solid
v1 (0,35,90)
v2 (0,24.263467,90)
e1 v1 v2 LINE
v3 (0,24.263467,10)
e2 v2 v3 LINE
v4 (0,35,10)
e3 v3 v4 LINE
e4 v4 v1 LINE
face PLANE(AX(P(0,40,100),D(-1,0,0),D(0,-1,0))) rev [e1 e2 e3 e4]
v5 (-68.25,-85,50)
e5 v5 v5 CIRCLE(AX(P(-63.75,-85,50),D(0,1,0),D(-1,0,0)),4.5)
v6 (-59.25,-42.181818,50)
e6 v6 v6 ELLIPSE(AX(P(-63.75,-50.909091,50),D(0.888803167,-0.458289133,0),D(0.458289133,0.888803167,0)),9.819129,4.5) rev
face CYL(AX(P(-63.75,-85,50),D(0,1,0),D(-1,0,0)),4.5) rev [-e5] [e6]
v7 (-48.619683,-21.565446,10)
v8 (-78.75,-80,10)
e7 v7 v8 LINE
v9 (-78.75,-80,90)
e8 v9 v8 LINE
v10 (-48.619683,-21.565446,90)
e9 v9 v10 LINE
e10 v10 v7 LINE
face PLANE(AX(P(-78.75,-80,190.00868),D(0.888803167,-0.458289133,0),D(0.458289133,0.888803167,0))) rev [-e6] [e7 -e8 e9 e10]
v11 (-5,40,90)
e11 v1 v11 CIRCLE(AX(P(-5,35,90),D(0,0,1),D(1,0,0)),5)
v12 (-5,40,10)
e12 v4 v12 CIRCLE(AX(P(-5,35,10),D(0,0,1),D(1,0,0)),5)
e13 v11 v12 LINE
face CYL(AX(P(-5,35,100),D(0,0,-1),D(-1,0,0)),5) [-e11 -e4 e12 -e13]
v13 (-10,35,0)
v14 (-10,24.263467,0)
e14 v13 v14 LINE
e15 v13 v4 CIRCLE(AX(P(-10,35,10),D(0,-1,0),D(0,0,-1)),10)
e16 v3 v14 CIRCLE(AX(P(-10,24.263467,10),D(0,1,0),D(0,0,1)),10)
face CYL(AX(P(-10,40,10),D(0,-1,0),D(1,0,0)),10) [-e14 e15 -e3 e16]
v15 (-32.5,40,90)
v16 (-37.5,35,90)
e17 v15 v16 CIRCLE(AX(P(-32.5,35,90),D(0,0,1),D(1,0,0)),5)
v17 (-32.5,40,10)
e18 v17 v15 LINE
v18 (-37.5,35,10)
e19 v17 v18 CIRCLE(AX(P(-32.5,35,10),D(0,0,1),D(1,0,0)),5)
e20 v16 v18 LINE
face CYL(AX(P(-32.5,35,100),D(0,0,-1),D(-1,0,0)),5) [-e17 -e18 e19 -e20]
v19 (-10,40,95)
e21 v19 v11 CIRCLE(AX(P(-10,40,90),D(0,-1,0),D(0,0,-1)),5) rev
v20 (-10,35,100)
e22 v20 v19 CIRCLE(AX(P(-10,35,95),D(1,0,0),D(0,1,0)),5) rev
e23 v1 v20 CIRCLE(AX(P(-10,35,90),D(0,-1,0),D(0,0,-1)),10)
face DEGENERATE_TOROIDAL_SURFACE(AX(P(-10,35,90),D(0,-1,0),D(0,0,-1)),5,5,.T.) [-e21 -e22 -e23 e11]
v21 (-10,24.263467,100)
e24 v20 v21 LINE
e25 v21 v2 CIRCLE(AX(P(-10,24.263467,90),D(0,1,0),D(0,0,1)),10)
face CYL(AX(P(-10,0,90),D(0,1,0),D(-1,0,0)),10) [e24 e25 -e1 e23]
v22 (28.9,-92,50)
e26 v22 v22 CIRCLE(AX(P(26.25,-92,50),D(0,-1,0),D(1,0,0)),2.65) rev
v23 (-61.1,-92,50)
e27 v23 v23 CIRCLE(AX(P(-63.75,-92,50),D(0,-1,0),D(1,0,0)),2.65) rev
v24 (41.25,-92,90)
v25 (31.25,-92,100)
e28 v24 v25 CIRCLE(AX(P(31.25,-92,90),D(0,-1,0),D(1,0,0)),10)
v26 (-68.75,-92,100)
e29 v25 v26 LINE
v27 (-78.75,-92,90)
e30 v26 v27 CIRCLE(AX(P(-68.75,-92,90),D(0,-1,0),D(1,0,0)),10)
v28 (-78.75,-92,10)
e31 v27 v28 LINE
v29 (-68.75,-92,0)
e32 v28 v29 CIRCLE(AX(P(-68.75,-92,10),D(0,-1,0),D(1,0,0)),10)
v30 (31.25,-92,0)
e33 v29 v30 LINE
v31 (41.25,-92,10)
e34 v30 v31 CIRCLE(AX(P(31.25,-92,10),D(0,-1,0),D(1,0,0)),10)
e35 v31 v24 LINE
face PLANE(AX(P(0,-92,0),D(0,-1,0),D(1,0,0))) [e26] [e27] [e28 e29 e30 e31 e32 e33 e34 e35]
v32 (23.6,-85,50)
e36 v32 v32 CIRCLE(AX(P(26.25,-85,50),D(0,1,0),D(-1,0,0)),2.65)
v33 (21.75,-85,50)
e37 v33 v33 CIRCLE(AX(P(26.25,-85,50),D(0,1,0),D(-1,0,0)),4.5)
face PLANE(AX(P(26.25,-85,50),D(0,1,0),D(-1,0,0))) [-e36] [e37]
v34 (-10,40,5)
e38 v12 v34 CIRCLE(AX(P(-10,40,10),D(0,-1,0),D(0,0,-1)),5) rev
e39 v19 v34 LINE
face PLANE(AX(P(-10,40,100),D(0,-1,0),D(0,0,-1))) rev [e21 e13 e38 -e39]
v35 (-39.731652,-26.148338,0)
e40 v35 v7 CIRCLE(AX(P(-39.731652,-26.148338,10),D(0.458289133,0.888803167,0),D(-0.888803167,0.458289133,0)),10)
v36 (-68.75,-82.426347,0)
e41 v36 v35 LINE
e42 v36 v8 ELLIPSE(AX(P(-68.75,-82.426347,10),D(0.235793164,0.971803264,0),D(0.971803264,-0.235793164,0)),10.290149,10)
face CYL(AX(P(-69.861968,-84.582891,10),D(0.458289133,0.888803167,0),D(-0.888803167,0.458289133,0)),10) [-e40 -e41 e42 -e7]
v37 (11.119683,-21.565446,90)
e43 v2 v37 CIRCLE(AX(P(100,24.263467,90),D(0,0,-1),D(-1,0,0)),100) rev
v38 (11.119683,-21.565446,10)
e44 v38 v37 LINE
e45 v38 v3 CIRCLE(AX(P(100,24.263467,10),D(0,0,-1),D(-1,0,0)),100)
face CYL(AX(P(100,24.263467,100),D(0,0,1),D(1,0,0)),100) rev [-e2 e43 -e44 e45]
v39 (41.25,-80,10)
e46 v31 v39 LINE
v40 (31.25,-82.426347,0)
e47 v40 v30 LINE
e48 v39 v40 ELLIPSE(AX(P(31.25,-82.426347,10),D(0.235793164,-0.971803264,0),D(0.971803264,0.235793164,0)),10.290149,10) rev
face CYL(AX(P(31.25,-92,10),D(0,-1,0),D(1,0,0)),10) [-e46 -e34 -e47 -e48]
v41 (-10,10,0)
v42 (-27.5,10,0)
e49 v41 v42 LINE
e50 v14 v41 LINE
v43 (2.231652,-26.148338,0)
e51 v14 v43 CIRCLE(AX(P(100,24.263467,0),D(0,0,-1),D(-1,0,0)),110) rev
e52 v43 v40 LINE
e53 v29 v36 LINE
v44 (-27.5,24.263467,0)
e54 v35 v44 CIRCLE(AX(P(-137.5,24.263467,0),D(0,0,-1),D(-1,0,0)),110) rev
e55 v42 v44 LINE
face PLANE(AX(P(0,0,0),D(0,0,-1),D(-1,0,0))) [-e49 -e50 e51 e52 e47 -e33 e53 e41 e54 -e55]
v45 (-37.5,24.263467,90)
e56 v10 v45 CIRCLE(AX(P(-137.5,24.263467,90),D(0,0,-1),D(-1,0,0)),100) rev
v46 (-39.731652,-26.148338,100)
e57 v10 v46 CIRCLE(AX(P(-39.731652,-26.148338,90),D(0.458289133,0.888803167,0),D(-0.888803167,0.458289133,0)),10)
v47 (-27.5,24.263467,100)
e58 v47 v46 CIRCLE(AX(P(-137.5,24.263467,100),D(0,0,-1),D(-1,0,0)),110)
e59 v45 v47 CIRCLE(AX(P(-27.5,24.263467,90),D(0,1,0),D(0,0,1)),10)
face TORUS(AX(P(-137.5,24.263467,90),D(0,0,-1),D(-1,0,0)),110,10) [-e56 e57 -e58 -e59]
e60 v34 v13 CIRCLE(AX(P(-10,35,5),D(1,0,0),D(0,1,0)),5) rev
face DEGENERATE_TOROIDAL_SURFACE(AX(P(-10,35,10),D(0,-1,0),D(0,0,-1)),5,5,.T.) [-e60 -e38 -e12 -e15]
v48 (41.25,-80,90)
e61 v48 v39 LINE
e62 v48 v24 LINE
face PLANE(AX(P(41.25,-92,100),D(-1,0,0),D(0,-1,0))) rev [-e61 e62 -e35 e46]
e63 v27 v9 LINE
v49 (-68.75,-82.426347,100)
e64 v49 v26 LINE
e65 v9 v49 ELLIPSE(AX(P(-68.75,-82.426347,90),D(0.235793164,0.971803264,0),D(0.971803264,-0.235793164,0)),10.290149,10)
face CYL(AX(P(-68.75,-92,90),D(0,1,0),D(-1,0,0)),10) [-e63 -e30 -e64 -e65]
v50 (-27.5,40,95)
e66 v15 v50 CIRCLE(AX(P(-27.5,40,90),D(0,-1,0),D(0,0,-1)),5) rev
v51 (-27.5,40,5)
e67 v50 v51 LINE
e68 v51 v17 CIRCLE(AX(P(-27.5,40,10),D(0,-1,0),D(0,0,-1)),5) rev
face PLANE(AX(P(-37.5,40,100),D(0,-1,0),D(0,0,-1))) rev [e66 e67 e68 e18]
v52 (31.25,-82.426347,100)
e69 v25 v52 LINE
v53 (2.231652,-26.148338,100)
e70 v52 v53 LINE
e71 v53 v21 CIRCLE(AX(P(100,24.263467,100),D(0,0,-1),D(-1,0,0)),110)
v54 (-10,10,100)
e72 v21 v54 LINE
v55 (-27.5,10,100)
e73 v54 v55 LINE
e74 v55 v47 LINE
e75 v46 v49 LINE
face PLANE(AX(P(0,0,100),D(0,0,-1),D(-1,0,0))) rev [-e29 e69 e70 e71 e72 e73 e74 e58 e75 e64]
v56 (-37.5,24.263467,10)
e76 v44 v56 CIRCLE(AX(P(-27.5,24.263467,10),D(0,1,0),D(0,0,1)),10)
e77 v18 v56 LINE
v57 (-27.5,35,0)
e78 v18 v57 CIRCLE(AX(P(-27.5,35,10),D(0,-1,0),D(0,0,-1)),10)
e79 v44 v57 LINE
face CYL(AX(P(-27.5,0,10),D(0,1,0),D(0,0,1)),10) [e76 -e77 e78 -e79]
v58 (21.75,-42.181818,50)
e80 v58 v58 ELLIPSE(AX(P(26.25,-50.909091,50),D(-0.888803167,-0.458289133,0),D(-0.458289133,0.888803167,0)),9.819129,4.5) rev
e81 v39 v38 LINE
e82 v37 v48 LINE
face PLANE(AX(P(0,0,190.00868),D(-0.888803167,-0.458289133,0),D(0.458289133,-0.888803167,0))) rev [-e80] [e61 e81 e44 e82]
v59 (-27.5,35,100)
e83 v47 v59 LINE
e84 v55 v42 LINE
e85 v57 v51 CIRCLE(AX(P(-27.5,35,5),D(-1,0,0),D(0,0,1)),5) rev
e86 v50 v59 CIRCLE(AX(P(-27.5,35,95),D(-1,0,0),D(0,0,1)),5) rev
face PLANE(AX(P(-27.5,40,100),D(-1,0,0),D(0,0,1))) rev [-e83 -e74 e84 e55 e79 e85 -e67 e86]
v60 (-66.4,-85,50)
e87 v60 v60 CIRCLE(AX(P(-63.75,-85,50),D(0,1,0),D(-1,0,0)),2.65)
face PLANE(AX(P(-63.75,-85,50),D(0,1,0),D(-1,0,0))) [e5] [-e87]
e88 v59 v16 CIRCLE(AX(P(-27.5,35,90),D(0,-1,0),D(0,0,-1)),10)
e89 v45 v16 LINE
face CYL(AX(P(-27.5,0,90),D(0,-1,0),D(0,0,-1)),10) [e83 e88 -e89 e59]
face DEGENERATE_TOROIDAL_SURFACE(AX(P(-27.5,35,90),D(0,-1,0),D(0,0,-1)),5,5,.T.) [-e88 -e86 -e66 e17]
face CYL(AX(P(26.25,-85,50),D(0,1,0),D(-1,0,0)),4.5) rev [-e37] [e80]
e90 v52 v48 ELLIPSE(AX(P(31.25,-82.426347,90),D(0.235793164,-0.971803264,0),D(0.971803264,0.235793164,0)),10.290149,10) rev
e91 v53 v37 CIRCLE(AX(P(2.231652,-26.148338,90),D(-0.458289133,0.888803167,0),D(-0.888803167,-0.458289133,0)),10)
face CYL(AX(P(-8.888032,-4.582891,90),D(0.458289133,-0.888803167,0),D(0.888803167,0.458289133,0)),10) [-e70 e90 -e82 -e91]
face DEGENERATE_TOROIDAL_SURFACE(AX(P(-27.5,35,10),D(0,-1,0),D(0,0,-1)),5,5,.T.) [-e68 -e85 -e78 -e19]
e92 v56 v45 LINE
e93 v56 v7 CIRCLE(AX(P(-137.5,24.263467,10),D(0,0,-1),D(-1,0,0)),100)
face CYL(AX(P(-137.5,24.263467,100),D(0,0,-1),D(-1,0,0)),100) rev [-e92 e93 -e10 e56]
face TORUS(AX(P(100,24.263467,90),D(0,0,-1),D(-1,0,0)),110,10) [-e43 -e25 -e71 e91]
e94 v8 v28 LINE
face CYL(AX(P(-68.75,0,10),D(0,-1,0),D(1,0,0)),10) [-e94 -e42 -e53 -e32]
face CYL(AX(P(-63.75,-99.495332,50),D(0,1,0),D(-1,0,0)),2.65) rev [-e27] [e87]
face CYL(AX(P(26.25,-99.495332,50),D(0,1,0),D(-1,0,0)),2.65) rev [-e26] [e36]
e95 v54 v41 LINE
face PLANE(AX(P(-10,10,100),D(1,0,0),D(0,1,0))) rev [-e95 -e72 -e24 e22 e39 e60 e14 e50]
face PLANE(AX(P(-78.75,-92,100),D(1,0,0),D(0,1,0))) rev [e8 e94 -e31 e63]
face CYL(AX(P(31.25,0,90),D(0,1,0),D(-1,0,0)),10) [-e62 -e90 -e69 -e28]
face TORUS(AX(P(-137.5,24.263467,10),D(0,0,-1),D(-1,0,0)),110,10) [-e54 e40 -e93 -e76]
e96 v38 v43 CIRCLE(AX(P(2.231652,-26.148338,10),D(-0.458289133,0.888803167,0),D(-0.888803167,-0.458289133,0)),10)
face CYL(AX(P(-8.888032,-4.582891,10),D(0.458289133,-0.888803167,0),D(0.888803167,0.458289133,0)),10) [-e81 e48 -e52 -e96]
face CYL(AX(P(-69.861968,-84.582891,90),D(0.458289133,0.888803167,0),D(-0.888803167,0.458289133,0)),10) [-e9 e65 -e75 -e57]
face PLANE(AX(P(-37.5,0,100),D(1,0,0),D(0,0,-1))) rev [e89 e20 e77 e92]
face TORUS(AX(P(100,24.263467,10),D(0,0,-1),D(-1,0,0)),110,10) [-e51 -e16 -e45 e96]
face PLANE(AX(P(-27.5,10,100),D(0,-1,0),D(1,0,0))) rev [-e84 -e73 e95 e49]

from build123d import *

# Parameters (mm, degrees)
BOSS_EXTRUDE1_DEPTH = 100
SKETCH2_W           = 120
SKETCH2_H           = 100
BOSS_EXTRUDE2_DEPTH = 92
SKETCH3_R           = 4.5
CUT_EXTRUDE1_DEPTH  = 85
SKETCH4_R           = 2.65
CUT_EXTRUDE2_DEPTH  = 7
CUT_EXTRUDE3_REACH  = 159.053
FILLET1_R           = 100
FILLET2_R           = 100
FILLET4_R           = 10
FILLET5_R           = 5


with BuildPart() as part:
    # Sketch1 → Boss-Extrude1 (new body)
    with BuildSketch(Plane.XY):
        Polygon((0, 0), (-37.5, 0), (-37.5, 40), (-27.5, 40), (-27.5, 10), (-10, 10), (-10, 40), (0, 40), align=None)
    extrude(amount=BOSS_EXTRUDE1_DEPTH)

    # Sketch2 → Boss-Extrude2 (add)
    with BuildSketch(Plane.XZ):
        with Locations((-18.75, 50)):
            Rectangle(SKETCH2_W, SKETCH2_H)
    extrude(amount=BOSS_EXTRUDE2_DEPTH)

    # Sketch3 → Cut-Extrude1 (cut)
    with BuildSketch(Plane(origin=(0, 0, 0), x_dir=(1, 0, 0), z_dir=(0, 1, 0))):
        with Locations(Location((26.25, -50, 0), (0, 0, 180))):
            Circle(SKETCH3_R)
        with Locations(Location((-63.75, -50, 0), (0, 0, 180))):
            Circle(SKETCH3_R)
    extrude(amount=-CUT_EXTRUDE1_DEPTH, mode=Mode.SUBTRACT)

    # Sketch4 → Cut-Extrude2 (cut)
    with BuildSketch(Plane(origin=(0, -85, 0), x_dir=(1, 0, 0), z_dir=(0, 1, 0))):
        with Locations(Location((26.25, -50, 0), (0, 0, 180))):
            Circle(SKETCH4_R)
        with Locations(Location((-63.75, -50, 0), (0, 0, 180))):
            Circle(SKETCH4_R)
    extrude(amount=-CUT_EXTRUDE2_DEPTH, mode=Mode.SUBTRACT)

    # Cut-Extrude3: up to this face of the body (flat: up to its plane)
    cut_extrude3_end = Plane(part.part.faces().sort_by_distance((-18.75, -40.86267166, 100))[0])
    # Sketch5 → Cut-Extrude3 (cut, up to the picked face)
    with BuildSketch(Plane(origin=(0, 0, 0), x_dir=(-1, 0, 0), z_dir=(0, 0, -1)), mode=Mode.PRIVATE) as cut_extrude3_sk1:
        Polygon((0, 0), (-41.25, -80), (-41.25, 0), align=None)
    cut_extrude3_tool1 = split(extrude(cut_extrude3_sk1.sketch, amount=-CUT_EXTRUDE3_REACH, mode=Mode.PRIVATE), bisect_by=cut_extrude3_end, keep=Keep.BOTH, mode=Mode.PRIVATE)
    # Sketch5 → Cut-Extrude3 (cut, up to the picked face)
    with BuildSketch(Plane(origin=(0, 0, 0), x_dir=(-1, 0, 0), z_dir=(0, 0, -1)), mode=Mode.PRIVATE) as cut_extrude3_sk2:
        Polygon((37.5, 0), (78.75, 0), (78.75, -80), align=None)
    cut_extrude3_tool2 = split(extrude(cut_extrude3_sk2.sketch, amount=-CUT_EXTRUDE3_REACH, mode=Mode.PRIVATE), bisect_by=cut_extrude3_end, keep=Keep.BOTH, mode=Mode.PRIVATE)
    add(cut_extrude3_tool1.solids().sort_by(Axis((27.5, -26.666667, 0), (0, 0, 1)))[0], mode=Mode.SUBTRACT)
    add(cut_extrude3_tool2.solids().sort_by(Axis((-65, -26.666667, 0), (0, 0, 1)))[0], mode=Mode.SUBTRACT)

    # Fillet1
    fillet1_edges = [part.edges().sort_by_distance(p)[0] for p in [
        (0, 0, 50),
    ]]
    fillet(fillet1_edges, radius=FILLET1_R)

    # Fillet2
    fillet2_edges = [part.edges().sort_by_distance(p)[0] for p in [
        (-37.5, 0, 50),
    ]]
    fillet(fillet2_edges, radius=FILLET2_R)

    # Fillet4
    fillet4_edges = [part.edges().sort_by_distance(p)[0] for p in [
        (-37.5, 32.131733499, 100),
        (-40.319673611, 0.684150576, 100),
        (-37.5, 32.131733499, 0),
        (-40.319673611, 0.684150576, 0),
        (-63.68484163, -50.78272316, 100),
        (-63.68484163, -50.78272316, 0),
        (0, 32.131733499, 0),
        (2.819673611, 0.684150576, 0),
        (0, 32.131733499, 100),
        (2.819673611, 0.684150576, 100),
        (26.18484163, -50.78272316, 0),
        (26.18484163, -50.78272316, 100),
        (41.25, -86, 0),
        (41.25, -86, 100),
        (-78.75, -86, 100),
        (-78.75, -86, 0),
    ]]
    fillet(fillet4_edges, radius=FILLET4_R - 0.0001)  # a hair under: the kernel refuses the full size

    # Fillet5
    fillet5_edges = [part.edges().sort_by_distance(p)[0] for p in [
        (-37.5, 40, 50),
        (-34.571097101, 40, 97.071097101),
        (-34.571097101, 40, 2.928902899),
        (0, 40, 50),
        (-2.928902899, 40, 97.071097101),
        (-2.928902899, 40, 2.928902899),
    ]]
    fillet(fillet5_edges, radius=FILLET5_R)


solid = part.part
